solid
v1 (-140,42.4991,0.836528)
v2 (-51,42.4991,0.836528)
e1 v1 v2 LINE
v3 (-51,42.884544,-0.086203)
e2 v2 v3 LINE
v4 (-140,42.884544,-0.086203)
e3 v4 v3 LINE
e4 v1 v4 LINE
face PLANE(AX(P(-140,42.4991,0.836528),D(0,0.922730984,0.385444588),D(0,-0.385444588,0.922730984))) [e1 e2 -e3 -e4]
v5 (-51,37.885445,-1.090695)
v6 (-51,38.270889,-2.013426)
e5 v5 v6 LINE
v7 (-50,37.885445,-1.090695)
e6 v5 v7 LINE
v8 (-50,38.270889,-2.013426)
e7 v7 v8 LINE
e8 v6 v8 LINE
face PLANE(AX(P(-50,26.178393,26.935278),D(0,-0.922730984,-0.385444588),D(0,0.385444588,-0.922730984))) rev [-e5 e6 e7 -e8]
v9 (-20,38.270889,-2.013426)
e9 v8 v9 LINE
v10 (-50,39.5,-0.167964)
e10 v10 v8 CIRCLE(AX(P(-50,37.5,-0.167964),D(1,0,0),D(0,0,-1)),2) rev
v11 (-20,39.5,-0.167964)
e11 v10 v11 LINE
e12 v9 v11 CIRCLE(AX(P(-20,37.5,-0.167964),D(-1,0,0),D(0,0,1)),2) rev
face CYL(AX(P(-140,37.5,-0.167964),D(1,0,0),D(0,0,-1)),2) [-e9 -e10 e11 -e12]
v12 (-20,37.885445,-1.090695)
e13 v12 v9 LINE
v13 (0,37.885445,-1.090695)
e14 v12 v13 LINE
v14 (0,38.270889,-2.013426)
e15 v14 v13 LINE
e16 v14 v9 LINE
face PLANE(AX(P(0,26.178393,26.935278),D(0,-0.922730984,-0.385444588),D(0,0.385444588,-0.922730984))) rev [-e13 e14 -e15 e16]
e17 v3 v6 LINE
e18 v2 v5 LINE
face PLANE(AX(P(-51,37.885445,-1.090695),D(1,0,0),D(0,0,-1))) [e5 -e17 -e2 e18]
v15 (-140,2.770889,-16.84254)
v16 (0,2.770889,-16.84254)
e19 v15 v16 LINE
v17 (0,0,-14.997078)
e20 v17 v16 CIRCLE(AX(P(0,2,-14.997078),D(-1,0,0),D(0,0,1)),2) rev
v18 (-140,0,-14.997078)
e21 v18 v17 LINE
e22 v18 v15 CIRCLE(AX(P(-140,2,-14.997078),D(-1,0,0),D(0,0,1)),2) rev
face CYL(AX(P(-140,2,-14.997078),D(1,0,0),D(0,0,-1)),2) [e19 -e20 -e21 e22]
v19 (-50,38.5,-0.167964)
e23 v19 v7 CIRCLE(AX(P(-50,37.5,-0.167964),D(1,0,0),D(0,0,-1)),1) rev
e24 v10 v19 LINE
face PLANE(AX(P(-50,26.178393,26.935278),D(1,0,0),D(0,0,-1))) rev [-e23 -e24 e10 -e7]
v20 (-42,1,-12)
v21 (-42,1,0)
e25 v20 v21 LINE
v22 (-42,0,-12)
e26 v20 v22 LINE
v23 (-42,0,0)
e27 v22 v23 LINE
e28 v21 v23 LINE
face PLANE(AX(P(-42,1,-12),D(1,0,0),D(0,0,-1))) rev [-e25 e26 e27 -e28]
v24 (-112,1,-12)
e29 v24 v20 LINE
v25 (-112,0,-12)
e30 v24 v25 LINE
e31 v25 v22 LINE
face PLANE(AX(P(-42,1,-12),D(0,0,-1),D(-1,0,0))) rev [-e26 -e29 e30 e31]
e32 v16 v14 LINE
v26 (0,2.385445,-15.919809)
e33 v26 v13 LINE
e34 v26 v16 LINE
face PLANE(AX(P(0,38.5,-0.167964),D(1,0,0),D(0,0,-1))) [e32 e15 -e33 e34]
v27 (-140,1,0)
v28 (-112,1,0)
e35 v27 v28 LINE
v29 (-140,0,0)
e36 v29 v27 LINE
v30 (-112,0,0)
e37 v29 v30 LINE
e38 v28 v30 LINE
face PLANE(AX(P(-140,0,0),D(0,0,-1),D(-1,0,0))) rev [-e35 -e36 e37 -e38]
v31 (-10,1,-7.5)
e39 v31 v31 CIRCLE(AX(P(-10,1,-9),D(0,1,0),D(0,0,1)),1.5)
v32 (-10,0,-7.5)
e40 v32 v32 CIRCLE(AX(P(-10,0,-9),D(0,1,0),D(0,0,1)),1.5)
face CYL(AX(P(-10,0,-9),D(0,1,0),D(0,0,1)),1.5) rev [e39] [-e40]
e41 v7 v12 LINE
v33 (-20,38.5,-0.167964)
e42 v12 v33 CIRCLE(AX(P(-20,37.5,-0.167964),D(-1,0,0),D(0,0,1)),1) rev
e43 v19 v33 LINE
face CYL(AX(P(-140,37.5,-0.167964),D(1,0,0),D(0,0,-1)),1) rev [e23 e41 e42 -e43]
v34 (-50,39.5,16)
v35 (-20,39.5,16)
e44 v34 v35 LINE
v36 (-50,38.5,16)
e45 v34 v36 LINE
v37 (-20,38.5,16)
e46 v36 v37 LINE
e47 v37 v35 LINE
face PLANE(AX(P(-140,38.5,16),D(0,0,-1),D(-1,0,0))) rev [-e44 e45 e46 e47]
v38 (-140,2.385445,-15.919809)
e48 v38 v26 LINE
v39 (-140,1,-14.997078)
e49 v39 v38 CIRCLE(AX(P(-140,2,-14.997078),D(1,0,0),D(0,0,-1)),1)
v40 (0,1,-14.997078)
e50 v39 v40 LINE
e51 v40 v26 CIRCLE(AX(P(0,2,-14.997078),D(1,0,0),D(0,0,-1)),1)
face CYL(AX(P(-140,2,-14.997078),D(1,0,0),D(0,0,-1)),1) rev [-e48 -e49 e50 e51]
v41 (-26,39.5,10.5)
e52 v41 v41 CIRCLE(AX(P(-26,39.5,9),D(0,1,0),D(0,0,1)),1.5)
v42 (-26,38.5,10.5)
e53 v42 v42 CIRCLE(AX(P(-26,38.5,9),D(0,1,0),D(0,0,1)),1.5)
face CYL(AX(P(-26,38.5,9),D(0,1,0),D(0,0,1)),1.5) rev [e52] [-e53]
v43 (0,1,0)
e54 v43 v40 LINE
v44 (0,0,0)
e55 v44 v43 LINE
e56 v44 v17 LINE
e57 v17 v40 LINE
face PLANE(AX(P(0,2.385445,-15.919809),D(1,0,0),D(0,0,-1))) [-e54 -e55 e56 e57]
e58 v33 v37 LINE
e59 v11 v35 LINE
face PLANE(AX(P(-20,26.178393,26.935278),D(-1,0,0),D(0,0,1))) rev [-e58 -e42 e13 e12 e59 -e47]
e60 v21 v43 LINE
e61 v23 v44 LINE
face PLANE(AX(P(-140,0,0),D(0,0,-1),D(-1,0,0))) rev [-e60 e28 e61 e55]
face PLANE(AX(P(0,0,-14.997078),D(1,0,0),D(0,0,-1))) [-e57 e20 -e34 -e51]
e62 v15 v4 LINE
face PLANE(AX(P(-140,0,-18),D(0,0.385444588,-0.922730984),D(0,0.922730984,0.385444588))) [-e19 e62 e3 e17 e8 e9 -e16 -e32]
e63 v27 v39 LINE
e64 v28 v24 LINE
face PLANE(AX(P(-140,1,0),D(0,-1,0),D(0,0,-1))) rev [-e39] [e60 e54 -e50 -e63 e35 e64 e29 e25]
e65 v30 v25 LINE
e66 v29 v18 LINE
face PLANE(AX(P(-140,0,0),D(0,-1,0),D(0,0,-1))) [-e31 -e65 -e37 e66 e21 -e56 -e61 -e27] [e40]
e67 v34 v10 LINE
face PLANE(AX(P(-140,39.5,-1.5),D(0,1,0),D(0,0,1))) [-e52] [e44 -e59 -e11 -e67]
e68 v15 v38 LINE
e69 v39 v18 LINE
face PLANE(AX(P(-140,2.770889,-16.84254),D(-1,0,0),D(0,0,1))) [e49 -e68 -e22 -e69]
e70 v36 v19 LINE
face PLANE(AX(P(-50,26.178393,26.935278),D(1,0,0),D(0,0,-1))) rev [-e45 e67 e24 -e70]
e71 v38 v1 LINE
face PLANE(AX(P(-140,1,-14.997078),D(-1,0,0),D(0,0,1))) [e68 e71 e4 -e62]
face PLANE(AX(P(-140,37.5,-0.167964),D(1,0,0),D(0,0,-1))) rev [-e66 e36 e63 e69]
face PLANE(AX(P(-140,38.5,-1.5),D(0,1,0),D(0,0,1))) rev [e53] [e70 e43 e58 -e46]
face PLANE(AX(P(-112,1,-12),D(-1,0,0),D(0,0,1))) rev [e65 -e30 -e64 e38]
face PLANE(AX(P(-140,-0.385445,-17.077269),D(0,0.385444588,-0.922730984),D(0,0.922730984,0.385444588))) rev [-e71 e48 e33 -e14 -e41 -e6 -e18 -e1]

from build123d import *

# Parameters (mm, degrees)
T_LE_DE_BASE_PLI_E1_DEPTH = 140
ESQUISSE6_W               = 70
ESQUISSE6_H               = 12
ENL_V_MAT_EXTRU_1_DEPTH   = 1
ESQUISSE7_W               = 90
ESQUISSE7_H               = 8.077316225
ESQUISSE7_W_2             = 20
ENL_V_MAT_EXTRU_2_DEPTH   = 148.230392024
ESQUISSE8_W               = 89
ESQUISSE8_H               = 5
PATTE1_DEPTH              = 1
ESQUISSE11_R              = 1.5
ENL_V_MAT_EXTRU_3_DEPTH   = 1
ESQUISSE12_R              = 1.5
ENL_V_MAT_EXTRU_4_DEPTH   = 1


# Sheet-metal steps are written as plain solids
with BuildPart() as part:
    # Esquisse1 → Tôle de base pliée1 (new body)
    with BuildSketch(Plane(origin=(0, 0, 0), x_dir=(0, 0, -1), z_dir=(1, 0, 0))):
        with BuildLine():
            Line((0, 0), (14.997077996, 0))
            ThreePointArc((14.997077996, 0), (16.661676799, 0.891347294), (16.842539964, 2.770889177))
            Line((16.842539964, 2.770889177), (2.01342604, 38.270889177))
            ThreePointArc((2.01342604, 38.270889177), (1.276616778, 39.164598804), (0.167964072, 39.5))
            Line((0.167964072, 39.5), (-16, 39.5))
            Line((-16, 39.5), (-16, 38.5))
            Line((-16, 38.5), (0.167964072, 38.5))
            ThreePointArc((0.167964072, 38.5), (0.722290425, 38.332299402), (1.090695056, 37.885444588))
            Line((1.090695056, 37.885444588), (15.91980898, 2.385444588))
            ThreePointArc((15.91980898, 2.385444588), (15.829377397, 1.445673647), (14.997077996, 1))
            Line((14.997077996, 1), (0, 1))
            Line((0, 1), (0, 0))
        make_face()
    extrude(amount=-T_LE_DE_BASE_PLI_E1_DEPTH)

    # Esquisse6 → Enlèv. mat.-Extru.1 (cut)
    with BuildSketch(Plane.XZ):
        with Locations((-77, -6)):
            Rectangle(ESQUISSE6_W, ESQUISSE6_H)
    extrude(amount=-ENL_V_MAT_EXTRU_1_DEPTH, mode=Mode.SUBTRACT)

    # Esquisse7 → Enlèv. mat.-Extru.2 (cut, through all)
    with BuildSketch(Plane(origin=(0, 6.401909959, -15.325784447), x_dir=(-1, 0, 0), z_dir=(0, 0.38544458835969, -0.9227309842550152))):
        with Locations((95, 38.57632918)):
            Rectangle(ESQUISSE7_W, ESQUISSE7_H)
        with Locations((10, 38.57632918)):
            Rectangle(ESQUISSE7_W_2, ESQUISSE7_H)
    extrude(amount=-ENL_V_MAT_EXTRU_2_DEPTH, mode=Mode.SUBTRACT)

    # Esquisse8 → Patte1 (add)
    with BuildSketch(Plane(origin=(0, 6.401909959, -15.325784447), x_dir=(-1, 0, 0), z_dir=(0, 0.38544458835969003, -0.9227309842550152))):
        with Locations((95.5, 37.037671067)):
            Rectangle(ESQUISSE8_W, ESQUISSE8_H)
    extrude(amount=-PATTE1_DEPTH)

    # Esquisse11 → Enlèv. mat.-Extru.3 (cut)
    with BuildSketch(Plane(origin=(0, 1, 0), x_dir=(1, 0, 0), z_dir=(0, 1, 0))):
        with Locations(Location((-10, 9, 0), (0, 0, 270))):
            Circle(ESQUISSE11_R)
    extrude(amount=-ENL_V_MAT_EXTRU_3_DEPTH, mode=Mode.SUBTRACT)

    # Esquisse12 → Enlèv. mat.-Extru.4 (cut)
    with BuildSketch(Plane(origin=(0, 39.5, 0), x_dir=(1, 0, 0), z_dir=(0, 1, 0))):
        with Locations(Location((-26, -9, 0), (0, 0, 270))):
            Circle(ESQUISSE12_R)
    extrude(amount=-ENL_V_MAT_EXTRU_4_DEPTH, mode=Mode.SUBTRACT)


solid = part.part
